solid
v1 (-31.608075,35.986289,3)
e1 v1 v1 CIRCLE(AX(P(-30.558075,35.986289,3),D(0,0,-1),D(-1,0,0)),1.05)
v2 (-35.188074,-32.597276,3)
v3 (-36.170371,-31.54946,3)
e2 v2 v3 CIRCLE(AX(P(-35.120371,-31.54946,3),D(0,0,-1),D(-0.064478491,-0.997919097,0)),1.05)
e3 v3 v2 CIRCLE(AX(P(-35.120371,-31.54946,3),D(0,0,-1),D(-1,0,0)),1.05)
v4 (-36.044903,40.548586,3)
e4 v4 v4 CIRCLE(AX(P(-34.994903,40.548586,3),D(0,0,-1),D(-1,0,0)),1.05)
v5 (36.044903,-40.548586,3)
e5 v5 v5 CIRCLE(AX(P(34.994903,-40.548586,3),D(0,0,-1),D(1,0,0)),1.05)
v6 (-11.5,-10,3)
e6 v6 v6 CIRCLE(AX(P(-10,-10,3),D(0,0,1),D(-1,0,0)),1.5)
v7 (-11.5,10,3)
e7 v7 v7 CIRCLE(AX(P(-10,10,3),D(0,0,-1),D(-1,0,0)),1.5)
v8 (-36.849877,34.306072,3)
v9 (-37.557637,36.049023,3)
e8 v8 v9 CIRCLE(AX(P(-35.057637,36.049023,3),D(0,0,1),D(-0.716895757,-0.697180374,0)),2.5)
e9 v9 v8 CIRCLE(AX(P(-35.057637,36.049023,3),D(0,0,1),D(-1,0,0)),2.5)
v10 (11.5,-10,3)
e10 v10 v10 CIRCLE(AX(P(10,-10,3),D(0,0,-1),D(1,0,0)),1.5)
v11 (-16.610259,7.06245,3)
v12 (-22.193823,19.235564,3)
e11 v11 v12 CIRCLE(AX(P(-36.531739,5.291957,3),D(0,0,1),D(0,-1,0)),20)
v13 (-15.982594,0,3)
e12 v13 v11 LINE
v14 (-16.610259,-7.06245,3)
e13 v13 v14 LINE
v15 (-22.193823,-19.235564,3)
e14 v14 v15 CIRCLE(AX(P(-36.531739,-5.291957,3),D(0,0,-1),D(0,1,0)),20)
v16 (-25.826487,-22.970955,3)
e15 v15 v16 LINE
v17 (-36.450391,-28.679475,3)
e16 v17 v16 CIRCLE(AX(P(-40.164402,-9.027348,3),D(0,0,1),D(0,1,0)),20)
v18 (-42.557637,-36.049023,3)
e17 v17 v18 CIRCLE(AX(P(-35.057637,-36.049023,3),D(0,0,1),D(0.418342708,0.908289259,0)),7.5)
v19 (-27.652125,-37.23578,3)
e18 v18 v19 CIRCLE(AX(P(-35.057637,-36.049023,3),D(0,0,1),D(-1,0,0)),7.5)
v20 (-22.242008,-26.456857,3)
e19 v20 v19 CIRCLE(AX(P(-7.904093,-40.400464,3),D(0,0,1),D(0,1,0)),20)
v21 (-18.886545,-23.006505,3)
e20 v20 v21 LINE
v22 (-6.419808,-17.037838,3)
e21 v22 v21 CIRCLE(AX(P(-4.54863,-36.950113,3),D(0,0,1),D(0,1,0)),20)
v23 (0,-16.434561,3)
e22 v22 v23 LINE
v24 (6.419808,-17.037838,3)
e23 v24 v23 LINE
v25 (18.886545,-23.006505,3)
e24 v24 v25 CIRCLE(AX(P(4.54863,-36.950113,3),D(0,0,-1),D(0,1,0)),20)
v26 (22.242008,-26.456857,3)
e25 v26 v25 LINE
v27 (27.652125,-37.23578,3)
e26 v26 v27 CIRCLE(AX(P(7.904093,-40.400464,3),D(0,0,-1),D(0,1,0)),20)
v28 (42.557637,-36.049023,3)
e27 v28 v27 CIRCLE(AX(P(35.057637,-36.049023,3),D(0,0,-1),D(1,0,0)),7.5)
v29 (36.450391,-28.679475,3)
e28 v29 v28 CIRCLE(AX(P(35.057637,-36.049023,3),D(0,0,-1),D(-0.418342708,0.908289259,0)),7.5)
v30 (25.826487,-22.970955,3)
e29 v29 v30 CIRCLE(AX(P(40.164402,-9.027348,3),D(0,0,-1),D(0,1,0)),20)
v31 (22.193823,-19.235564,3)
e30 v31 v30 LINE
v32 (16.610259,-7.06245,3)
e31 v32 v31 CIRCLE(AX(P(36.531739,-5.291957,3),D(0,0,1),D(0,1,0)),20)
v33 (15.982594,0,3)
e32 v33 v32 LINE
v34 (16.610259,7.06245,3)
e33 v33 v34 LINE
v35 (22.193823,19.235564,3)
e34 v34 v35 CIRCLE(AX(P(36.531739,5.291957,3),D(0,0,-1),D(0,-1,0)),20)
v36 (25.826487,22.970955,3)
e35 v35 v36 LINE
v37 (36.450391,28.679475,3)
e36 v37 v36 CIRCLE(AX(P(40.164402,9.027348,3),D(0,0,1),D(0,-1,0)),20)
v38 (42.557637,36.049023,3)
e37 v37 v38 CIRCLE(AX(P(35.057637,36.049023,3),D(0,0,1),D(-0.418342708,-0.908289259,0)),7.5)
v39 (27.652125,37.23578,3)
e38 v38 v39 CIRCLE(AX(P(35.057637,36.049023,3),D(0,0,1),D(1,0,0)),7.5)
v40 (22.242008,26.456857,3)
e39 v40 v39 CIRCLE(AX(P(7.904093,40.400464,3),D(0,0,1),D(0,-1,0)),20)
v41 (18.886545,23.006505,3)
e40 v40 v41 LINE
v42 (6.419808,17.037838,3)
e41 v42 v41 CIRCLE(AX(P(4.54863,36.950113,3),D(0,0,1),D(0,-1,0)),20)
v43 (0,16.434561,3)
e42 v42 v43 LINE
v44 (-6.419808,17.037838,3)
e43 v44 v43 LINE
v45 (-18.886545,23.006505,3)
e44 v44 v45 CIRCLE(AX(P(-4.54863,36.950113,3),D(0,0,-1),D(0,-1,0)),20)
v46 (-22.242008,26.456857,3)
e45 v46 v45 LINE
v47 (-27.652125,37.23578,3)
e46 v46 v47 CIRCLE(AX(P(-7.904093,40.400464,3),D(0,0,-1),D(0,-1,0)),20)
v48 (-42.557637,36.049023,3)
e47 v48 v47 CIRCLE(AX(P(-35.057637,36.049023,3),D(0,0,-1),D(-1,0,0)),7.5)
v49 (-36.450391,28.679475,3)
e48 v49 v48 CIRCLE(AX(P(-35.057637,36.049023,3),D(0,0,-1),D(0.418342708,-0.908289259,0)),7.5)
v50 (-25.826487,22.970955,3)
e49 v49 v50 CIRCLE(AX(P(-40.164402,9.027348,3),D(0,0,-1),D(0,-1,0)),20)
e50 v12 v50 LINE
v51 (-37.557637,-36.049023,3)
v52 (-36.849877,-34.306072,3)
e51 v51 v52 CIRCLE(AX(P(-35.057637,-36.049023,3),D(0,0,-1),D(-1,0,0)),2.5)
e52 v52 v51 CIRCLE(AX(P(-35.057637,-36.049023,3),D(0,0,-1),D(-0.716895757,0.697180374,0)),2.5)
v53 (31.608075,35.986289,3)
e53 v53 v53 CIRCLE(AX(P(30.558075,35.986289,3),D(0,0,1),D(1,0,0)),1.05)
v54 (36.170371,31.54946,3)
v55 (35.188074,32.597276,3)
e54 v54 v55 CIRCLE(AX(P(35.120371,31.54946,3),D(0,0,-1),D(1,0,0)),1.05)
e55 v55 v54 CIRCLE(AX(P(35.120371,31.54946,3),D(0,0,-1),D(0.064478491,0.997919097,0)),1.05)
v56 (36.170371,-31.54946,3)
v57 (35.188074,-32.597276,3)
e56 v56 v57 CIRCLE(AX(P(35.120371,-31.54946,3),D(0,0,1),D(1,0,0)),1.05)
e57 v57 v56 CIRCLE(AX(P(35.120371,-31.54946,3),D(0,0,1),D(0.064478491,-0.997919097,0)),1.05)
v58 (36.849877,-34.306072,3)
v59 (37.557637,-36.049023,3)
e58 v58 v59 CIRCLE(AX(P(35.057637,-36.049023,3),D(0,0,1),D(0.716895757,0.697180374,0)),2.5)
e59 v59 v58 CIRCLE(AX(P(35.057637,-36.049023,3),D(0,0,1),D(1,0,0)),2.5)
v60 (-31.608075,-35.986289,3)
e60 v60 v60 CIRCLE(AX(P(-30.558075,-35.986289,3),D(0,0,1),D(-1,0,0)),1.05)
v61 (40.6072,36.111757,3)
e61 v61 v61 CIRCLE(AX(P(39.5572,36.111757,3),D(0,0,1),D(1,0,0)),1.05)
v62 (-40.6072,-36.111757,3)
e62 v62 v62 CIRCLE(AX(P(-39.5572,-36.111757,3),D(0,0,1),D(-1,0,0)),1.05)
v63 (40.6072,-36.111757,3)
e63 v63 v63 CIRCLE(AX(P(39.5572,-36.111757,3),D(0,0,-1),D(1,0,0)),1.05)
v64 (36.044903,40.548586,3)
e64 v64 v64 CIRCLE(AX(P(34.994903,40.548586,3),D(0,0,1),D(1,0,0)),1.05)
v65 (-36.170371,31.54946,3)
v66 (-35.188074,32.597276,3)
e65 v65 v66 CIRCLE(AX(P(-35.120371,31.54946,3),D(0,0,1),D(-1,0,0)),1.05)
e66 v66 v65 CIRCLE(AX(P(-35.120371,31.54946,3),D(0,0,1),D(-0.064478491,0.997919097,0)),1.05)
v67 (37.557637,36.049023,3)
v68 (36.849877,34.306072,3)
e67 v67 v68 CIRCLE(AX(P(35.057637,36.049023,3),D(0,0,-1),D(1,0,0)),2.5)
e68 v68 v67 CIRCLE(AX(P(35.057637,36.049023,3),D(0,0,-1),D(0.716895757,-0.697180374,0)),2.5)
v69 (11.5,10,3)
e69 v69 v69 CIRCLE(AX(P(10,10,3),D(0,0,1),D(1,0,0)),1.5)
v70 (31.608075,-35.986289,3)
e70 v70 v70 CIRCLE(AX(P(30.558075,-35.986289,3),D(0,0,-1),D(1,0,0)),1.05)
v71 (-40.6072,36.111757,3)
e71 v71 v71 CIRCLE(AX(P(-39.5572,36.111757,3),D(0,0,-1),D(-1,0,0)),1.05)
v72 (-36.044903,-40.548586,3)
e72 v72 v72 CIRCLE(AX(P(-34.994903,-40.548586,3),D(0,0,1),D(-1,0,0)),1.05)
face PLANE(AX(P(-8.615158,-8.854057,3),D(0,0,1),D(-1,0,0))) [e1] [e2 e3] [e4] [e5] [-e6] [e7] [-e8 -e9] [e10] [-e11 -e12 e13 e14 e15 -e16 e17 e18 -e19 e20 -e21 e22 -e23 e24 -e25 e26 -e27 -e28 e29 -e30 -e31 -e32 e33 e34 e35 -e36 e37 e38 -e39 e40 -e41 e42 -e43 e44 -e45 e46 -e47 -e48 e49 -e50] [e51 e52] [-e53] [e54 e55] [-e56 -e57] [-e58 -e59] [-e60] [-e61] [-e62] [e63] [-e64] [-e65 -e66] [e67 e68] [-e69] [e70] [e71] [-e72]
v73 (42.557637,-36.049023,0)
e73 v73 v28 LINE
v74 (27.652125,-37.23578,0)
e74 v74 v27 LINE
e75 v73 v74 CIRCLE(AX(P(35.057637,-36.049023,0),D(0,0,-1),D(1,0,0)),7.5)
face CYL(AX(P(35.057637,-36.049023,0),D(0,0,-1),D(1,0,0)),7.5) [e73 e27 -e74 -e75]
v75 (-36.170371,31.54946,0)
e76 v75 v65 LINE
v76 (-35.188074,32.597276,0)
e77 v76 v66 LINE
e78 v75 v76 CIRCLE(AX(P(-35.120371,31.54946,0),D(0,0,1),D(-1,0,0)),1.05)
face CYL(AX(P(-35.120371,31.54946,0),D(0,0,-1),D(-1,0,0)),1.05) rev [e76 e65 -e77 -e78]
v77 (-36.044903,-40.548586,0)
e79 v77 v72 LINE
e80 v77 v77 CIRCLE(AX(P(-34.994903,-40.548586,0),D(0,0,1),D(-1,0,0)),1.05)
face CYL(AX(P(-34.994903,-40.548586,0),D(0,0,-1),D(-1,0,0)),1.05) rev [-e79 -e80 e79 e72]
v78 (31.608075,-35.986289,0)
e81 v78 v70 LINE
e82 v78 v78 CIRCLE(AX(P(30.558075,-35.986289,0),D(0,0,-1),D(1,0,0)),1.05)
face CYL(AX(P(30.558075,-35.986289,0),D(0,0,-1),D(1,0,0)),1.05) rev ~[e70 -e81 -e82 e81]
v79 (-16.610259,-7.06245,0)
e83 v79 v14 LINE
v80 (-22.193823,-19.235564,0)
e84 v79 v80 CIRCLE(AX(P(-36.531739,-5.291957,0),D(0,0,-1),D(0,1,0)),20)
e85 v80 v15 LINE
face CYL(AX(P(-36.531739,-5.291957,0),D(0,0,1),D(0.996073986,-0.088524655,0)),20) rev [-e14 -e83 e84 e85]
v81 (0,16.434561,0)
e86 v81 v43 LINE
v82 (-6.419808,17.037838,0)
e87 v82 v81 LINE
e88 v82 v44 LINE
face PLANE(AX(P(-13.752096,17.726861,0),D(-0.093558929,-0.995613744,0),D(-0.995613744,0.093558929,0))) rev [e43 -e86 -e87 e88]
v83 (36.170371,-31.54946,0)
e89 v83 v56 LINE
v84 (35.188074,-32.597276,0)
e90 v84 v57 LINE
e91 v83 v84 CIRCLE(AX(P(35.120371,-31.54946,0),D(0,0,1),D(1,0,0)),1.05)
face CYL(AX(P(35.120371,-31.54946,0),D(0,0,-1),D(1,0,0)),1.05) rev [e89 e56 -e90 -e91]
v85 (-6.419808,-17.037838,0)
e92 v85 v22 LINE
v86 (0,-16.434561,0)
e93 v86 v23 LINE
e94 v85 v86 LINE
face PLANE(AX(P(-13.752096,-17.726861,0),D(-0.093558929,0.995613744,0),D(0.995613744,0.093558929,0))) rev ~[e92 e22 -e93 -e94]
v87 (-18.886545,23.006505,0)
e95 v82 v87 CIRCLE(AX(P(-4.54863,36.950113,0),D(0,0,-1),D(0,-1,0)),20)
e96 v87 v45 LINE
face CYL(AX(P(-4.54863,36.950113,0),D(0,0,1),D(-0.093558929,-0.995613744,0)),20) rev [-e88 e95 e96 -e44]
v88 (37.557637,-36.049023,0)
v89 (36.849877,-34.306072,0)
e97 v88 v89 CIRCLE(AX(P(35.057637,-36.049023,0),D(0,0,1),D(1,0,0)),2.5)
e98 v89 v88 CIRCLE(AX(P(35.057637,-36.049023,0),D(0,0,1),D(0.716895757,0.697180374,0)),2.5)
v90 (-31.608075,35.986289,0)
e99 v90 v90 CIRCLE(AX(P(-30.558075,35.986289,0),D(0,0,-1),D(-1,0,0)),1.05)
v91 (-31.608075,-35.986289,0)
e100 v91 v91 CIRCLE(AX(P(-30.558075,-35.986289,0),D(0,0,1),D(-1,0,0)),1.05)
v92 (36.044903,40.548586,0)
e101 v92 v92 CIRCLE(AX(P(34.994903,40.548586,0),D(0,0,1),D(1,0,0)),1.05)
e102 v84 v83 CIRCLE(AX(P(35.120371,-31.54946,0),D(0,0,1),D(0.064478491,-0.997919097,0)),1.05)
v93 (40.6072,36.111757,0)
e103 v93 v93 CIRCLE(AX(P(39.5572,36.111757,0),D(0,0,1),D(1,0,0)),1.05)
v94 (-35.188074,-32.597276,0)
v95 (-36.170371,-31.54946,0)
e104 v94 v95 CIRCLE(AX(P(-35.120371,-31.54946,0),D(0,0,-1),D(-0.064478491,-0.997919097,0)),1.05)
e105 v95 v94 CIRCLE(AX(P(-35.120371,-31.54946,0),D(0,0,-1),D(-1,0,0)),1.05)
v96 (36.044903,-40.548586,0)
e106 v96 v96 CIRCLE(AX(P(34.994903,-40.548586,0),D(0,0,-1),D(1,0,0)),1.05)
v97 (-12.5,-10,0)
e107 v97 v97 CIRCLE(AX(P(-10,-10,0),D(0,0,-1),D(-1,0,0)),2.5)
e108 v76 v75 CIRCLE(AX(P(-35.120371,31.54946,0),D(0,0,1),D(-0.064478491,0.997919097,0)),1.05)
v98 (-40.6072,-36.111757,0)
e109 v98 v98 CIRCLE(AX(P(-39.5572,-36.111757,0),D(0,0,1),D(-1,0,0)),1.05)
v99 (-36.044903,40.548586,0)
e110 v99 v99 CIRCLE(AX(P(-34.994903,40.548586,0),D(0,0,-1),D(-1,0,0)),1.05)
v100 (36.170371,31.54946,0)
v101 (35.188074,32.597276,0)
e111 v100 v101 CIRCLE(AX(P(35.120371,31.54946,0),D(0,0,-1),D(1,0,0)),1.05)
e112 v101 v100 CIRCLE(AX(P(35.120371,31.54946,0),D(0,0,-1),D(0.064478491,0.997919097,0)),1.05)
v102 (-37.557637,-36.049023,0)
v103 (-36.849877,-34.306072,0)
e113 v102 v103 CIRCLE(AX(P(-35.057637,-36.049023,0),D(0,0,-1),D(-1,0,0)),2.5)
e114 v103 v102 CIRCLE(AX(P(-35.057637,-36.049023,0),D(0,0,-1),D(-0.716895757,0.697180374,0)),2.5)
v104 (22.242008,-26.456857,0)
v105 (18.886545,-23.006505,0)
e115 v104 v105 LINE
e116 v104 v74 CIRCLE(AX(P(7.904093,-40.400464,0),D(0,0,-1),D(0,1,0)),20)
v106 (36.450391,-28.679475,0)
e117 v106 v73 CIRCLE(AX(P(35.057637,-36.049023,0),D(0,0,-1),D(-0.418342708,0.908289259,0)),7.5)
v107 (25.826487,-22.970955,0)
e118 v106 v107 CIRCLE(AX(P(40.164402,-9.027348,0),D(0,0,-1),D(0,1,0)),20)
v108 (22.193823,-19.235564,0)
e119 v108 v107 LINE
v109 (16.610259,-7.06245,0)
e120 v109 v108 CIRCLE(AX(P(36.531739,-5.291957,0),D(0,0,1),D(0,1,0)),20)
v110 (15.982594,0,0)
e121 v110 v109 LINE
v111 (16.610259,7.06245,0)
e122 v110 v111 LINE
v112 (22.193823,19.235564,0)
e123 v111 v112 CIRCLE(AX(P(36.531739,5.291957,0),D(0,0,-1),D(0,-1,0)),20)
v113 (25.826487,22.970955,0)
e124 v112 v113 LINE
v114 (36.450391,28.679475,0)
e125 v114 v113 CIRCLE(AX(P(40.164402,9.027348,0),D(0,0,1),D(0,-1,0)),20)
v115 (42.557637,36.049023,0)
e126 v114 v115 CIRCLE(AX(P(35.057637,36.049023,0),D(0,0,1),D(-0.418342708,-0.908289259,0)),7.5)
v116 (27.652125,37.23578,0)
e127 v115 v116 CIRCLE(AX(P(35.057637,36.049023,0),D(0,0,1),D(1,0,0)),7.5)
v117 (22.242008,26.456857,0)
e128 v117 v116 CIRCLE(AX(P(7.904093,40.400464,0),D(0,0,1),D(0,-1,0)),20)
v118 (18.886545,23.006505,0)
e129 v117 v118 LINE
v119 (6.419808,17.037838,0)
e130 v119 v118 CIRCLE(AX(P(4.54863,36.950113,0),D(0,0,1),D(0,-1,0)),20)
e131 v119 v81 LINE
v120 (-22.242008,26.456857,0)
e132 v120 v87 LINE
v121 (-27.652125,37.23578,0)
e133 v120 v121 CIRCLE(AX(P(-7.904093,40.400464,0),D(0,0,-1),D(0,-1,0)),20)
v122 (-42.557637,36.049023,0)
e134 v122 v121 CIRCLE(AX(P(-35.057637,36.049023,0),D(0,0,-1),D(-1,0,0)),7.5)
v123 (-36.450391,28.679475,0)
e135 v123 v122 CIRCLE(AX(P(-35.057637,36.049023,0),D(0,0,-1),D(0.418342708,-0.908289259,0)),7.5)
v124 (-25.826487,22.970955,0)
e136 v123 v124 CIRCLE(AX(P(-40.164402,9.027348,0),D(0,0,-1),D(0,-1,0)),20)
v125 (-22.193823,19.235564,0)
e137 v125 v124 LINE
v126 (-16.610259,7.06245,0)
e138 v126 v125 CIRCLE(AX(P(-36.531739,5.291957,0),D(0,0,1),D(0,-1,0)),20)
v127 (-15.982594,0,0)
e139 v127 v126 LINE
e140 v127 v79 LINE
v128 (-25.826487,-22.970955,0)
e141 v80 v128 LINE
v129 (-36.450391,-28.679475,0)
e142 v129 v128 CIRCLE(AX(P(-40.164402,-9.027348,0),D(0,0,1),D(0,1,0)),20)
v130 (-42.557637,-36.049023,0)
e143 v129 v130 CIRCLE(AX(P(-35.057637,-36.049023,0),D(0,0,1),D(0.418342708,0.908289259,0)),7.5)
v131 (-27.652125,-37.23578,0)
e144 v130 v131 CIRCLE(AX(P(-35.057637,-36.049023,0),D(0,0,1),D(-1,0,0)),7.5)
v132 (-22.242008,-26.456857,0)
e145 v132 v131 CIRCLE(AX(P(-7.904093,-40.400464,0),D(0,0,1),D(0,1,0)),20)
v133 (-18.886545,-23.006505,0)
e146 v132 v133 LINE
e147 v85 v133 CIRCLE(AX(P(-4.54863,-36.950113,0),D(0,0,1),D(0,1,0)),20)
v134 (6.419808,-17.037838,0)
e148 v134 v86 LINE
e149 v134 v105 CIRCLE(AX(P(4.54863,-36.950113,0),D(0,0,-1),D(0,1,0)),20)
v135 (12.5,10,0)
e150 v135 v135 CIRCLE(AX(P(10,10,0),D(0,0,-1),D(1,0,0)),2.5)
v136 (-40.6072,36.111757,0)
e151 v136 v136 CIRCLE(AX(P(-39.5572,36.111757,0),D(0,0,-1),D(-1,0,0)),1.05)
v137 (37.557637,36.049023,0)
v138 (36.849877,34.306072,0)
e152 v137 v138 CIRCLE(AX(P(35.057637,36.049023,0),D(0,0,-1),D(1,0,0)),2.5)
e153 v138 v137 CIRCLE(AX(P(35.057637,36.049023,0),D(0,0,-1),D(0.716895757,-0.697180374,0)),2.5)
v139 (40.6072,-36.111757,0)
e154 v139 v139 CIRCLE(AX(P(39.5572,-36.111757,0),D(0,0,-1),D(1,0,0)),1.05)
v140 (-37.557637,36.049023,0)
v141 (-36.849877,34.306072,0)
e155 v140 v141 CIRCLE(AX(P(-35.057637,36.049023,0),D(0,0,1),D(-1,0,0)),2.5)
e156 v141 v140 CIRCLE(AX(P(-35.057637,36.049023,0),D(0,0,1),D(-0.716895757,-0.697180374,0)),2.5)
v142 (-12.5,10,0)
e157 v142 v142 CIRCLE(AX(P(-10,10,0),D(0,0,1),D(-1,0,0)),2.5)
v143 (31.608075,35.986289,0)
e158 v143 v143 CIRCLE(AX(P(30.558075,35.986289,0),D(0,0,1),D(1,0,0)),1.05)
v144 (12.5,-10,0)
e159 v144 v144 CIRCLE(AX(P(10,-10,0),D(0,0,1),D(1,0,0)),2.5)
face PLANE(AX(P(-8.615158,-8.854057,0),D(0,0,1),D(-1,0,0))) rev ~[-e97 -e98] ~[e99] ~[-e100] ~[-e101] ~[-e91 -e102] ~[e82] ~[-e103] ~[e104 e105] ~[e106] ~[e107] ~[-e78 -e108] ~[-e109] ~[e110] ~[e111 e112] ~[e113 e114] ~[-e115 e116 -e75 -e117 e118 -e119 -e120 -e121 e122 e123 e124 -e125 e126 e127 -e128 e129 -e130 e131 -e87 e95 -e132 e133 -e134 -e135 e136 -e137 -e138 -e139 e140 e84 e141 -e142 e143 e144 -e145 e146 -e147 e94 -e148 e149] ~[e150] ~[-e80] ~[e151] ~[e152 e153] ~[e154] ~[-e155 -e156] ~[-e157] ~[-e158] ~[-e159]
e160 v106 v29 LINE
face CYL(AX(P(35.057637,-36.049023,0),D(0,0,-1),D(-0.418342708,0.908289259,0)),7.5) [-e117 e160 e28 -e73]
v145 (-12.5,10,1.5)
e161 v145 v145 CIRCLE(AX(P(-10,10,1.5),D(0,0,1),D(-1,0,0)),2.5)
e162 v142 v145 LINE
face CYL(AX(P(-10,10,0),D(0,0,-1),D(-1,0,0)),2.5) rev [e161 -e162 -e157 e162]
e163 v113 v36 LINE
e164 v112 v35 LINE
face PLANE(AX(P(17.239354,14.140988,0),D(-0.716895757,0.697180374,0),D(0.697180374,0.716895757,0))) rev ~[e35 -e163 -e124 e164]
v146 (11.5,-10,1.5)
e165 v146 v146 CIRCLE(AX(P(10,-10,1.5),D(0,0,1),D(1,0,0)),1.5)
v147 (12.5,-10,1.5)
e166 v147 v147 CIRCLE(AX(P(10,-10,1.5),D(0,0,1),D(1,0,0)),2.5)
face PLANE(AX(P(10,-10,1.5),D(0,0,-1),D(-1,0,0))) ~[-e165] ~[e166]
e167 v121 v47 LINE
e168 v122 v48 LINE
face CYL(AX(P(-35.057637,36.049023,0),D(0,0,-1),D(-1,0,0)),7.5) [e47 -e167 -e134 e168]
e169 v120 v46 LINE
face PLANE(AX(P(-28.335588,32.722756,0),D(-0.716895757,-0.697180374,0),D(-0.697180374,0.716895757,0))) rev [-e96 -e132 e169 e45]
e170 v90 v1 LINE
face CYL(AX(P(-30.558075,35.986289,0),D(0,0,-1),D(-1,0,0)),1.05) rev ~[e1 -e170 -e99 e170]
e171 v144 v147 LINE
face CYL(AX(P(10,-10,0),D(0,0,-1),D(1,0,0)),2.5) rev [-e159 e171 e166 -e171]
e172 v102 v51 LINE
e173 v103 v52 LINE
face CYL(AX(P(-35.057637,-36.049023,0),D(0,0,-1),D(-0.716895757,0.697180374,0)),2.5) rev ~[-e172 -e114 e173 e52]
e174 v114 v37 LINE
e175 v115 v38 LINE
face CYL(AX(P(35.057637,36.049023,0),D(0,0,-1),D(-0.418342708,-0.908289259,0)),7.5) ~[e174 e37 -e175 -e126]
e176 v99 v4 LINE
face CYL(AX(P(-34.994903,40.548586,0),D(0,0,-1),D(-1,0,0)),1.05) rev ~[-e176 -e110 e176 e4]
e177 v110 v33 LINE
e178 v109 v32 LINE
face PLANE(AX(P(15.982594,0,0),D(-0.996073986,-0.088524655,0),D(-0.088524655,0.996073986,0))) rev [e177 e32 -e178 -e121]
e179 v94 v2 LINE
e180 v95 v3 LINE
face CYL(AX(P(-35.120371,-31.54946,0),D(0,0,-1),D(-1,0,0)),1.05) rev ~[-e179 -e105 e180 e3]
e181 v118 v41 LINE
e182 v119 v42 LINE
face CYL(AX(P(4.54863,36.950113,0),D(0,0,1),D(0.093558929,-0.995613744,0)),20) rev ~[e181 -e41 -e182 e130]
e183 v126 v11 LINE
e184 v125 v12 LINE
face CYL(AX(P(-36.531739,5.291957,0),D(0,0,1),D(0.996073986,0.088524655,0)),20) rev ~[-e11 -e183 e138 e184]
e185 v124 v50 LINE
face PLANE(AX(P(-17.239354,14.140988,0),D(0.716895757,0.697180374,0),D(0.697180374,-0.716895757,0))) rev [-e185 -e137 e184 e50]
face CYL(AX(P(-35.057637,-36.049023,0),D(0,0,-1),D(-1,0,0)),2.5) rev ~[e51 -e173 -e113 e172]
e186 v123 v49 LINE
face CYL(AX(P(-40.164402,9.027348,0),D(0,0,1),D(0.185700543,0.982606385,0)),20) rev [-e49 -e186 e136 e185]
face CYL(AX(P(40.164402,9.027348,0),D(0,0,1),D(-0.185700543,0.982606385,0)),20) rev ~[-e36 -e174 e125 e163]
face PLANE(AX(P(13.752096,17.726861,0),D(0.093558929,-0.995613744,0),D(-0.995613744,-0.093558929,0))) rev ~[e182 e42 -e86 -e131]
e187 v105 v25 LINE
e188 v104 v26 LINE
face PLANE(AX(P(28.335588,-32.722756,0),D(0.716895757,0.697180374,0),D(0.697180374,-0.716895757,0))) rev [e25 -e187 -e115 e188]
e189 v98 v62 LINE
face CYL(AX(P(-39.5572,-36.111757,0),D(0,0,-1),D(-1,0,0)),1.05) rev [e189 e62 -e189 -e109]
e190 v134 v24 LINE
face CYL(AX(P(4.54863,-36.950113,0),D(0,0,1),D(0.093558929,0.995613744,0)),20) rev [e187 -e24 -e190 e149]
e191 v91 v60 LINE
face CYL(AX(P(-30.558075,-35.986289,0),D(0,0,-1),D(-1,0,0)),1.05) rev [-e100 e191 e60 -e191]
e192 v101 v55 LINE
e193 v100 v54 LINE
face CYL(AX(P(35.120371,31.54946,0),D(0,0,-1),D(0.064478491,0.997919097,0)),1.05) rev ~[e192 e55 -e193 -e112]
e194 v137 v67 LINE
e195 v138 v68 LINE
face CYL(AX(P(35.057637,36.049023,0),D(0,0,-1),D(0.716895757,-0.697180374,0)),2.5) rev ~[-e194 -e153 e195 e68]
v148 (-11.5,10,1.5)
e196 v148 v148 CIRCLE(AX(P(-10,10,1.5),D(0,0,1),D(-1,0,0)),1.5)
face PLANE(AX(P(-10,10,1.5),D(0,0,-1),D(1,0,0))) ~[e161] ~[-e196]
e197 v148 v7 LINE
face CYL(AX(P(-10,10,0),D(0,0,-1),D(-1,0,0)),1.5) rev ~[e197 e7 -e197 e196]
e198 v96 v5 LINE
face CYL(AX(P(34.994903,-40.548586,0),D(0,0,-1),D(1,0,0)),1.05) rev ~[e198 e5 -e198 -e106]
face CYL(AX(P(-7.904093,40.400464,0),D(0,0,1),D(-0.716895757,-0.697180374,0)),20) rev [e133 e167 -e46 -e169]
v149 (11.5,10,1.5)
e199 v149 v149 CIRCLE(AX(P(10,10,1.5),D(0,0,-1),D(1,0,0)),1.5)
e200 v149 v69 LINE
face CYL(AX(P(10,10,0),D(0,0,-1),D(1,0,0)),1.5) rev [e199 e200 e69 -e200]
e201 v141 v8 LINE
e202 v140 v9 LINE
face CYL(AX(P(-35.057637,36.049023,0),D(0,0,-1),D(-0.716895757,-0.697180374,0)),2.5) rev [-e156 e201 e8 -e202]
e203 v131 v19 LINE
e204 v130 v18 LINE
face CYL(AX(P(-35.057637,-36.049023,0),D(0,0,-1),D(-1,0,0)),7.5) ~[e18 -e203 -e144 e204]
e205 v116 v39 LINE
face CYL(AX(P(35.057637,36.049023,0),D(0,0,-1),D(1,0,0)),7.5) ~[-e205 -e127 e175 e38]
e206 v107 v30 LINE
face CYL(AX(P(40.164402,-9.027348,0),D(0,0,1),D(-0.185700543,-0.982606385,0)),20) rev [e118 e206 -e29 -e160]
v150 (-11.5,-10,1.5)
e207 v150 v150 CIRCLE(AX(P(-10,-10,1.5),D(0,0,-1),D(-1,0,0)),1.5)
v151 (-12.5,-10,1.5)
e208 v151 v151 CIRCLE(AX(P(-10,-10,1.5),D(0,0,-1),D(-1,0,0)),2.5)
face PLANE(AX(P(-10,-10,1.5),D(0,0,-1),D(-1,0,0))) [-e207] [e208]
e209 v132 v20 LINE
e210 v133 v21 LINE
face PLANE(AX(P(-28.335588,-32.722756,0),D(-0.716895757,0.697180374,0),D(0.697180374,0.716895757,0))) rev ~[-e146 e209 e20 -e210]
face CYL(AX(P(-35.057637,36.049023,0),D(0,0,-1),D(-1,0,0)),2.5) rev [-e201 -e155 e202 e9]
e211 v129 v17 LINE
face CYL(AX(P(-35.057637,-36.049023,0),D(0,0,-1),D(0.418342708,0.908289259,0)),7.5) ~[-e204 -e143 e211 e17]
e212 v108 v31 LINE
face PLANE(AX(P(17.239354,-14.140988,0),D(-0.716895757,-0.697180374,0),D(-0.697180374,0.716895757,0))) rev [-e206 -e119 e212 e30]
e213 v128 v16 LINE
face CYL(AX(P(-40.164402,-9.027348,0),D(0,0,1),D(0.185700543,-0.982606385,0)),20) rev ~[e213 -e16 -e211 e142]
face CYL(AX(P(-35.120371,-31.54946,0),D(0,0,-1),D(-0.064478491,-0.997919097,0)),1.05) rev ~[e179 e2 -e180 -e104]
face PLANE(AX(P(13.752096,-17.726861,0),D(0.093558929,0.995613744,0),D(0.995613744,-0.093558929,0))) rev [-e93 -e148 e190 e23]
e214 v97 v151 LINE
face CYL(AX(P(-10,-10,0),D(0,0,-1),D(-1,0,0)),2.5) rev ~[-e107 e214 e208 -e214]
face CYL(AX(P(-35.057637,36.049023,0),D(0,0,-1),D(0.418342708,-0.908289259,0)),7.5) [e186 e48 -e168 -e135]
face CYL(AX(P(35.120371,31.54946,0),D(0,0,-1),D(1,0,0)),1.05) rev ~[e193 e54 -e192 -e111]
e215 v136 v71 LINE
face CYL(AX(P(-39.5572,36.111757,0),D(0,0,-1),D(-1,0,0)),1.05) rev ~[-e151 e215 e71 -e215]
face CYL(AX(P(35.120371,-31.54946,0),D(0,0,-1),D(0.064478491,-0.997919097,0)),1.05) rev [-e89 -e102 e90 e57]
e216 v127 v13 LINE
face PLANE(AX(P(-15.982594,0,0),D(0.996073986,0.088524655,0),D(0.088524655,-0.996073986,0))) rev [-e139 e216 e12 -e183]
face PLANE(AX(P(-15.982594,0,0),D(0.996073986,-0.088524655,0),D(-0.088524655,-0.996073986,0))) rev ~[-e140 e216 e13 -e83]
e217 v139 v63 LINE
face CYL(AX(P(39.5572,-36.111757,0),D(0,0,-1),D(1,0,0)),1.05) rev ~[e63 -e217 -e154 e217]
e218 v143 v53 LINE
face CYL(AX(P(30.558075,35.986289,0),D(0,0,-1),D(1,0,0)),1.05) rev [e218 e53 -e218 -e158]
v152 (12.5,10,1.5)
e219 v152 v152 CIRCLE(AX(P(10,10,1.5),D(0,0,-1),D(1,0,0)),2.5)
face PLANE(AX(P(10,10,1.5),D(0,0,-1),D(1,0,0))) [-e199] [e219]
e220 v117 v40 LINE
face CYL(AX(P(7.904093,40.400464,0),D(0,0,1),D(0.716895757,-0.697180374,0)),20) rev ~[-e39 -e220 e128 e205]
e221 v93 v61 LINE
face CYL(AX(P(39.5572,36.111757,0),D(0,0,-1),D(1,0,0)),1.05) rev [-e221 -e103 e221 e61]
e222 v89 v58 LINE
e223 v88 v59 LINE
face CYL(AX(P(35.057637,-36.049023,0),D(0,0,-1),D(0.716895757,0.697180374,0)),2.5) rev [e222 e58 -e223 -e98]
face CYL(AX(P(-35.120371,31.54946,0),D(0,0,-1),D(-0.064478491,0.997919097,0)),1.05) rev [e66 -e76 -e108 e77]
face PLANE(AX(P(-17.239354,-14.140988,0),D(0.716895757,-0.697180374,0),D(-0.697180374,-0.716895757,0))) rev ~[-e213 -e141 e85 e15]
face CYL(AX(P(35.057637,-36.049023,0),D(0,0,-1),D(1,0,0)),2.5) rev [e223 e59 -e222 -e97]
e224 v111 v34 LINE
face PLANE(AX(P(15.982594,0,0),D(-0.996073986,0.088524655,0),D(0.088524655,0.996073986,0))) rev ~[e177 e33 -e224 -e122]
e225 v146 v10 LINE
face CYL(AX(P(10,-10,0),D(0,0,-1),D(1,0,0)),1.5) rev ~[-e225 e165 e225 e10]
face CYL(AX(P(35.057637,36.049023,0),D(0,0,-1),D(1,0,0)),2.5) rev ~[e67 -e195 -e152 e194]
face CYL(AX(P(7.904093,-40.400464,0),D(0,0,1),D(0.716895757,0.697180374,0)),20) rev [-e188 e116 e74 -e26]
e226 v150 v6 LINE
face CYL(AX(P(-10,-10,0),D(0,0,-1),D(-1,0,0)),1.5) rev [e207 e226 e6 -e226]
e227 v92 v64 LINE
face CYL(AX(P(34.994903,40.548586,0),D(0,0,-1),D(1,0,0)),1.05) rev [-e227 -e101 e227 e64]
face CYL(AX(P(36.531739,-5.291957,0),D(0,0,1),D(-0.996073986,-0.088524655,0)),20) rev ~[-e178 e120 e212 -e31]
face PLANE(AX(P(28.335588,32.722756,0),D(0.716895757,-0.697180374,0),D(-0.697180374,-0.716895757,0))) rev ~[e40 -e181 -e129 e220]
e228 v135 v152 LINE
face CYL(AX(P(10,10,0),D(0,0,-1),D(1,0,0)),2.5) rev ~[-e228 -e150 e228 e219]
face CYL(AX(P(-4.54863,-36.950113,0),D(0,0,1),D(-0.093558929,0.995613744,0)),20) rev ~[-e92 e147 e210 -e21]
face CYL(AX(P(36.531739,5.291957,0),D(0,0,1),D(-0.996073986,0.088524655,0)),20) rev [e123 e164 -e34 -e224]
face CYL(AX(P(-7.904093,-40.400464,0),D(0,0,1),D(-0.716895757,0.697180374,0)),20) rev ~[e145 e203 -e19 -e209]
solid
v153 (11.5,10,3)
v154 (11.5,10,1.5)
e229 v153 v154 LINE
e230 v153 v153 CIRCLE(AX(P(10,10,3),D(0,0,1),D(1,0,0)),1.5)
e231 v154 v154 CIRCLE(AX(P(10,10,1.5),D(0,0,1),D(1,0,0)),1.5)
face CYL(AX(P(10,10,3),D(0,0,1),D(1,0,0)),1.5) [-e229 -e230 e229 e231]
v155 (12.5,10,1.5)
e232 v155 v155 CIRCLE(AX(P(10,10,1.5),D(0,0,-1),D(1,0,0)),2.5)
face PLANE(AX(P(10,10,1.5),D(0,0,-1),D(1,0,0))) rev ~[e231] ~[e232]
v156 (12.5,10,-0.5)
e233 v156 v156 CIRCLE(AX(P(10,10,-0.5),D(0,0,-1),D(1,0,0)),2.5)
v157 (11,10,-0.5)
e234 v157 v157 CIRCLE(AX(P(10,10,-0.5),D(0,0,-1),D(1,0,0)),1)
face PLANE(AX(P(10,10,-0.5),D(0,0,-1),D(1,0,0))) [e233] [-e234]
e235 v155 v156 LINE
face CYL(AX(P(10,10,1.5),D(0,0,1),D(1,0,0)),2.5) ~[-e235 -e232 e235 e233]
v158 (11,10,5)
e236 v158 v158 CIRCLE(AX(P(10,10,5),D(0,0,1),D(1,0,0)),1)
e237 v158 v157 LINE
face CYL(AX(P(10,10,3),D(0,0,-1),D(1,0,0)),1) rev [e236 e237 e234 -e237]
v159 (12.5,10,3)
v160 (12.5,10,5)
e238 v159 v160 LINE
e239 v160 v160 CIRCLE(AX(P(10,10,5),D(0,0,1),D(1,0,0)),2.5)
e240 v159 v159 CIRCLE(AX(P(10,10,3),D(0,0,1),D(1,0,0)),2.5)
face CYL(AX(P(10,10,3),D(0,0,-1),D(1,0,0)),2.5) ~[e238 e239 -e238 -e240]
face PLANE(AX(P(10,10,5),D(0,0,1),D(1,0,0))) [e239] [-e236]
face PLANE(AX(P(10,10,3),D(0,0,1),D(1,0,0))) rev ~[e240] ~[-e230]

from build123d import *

# Parameters (mm, degrees)
F0_R      = 1.5
F0_R_2    = 1.05
F1_DEPTH  = 3
F2_R      = 20
F3_R      = 2.5
F4_DEPTH  = 1.5
F7_R      = 1.5
F7_R_2    = 1
F8_DEPTH  = 1.5
F9_R      = 2.5
F9_R_2    = 1.5
F9_R_3    = 1
F10_DEPTH = 2
F11_R     = 2.5
F11_R_2   = 1
F12_DEPTH = 2


with BuildPart() as f1:
    # F0 (on Top) → F1 (new body)
    with BuildSketch(Plane.XY):
        Polygon((17.5900963695, 18.0875221416), (13.7520964623, 17.7268610305), (0, 16.4345612622), (0, 0), (15.9825936427, 0), (17.239353816, 14.1409884306), align=None)
        with Locations((10, 10)):
            Circle(F0_R, mode=Mode.SUBTRACT)
        with BuildLine():
            ThreePointArc((31.9200670418, 29.2368537374), (29.8287845463, 30.6723050065), (28.3355882575, 32.722755607))
            Line((28.3355882575, 32.722755607), (13.7520964623, 17.7268610305))
            Line((13.7520964623, 17.7268610305), (17.5900963695, 18.0875221416))
            Line((17.5900963695, 18.0875221416), (17.239353816, 14.1409884306))
            Line((17.239353816, 14.1409884306), (31.9200670418, 29.2368537374))
        make_face()
        with BuildLine():
            ThreePointArc((31.9200670418, 29.2368537374), (39.1022771791, 29.7330997621), (42.5576373508, 36.049023183))
            ThreePointArc((42.5576373508, 36.049023183), (33.3496221576, 43.3519461663), (28.3355882575, 32.722755607))
            ThreePointArc((28.3355882575, 32.722755607), (29.8287845463, 30.6723050065), (31.9200670418, 29.2368537374))
        make_face()
        with BuildLine():
            ThreePointArc((35.1880737305, 32.5972755395), (35.8863959675, 32.2675873788), (36.1703713151, 31.5494604876))
            ThreePointArc((36.1703713151, 31.5494604876), (34.3543466627, 30.8313335964), (35.1880737305, 32.5972755395))
        make_face(mode=Mode.SUBTRACT)
        with Locations((30.5580746554, 35.9862892186)):
            Circle(F0_R_2, mode=Mode.SUBTRACT)
        with BuildLine():
            ThreePointArc((36.8498767429, 34.3060722482), (32.7413257914, 36.9896085113), (37.5576373508, 36.049023183))
            ThreePointArc((37.5576373508, 36.049023183), (37.3739489102, 35.1084378547), (36.8498767429, 34.3060722482))
        make_face(mode=Mode.SUBTRACT)
        with Locations((39.5572000461, 36.1117571474)):
            Circle(F0_R_2, mode=Mode.SUBTRACT)
        with Locations((34.9949033864, 40.5485858784)):
            Circle(F0_R_2, mode=Mode.SUBTRACT)
    extrude(amount=F1_DEPTH)

    # F2
    f2_edges = [f1.edges().sort_by_distance(p)[0] for p in [
        (17.239354, 14.140988, 1.5),
        (13.752096, 17.726861, 1.5),
        (31.920067, 29.236854, 1.5),
        (28.335588, 32.722756, 1.5),
    ]]
    fillet(f2_edges, radius=F2_R)

    # F3 (on face) → F4 (cut)
    with BuildSketch(Plane(origin=(0, 0, 0), x_dir=(1, 0, 0), z_dir=(0, 0, -1))):
        with Locations((10, -10)):
            Circle(F3_R)
    extrude(amount=-F4_DEPTH, mode=Mode.SUBTRACT)

    # F5: F1 across plane


with BuildPart() as f1_1:
    add(f1.part)
    add(f1.part.mirror(Plane.YZ))

    # F6: F1 across plane


with BuildPart() as f1_2:
    add(f1_1.part)
    add(f1_1.part.mirror(Plane.XZ))


with BuildPart() as f8:
    # F7 (on face) → F8 (new body)
    with BuildSketch(Plane.XY.offset(3)):
        with Locations((10, 10)):
            Circle(F7_R)
        with Locations((10, 10)):
            Circle(F7_R_2, mode=Mode.SUBTRACT)
    extrude(amount=-F8_DEPTH)

    # F9 (on face) → F10 (join)
    with BuildSketch(Plane(origin=(0, 0, 1.5), x_dir=(1, 0, 0), z_dir=(0, 0, -1))):
        with Locations((10, -10)):
            Circle(F9_R)
        with Locations((10, -10)):
            Circle(F9_R_2, mode=Mode.SUBTRACT)
        with Locations((10, -10)):
            Circle(F9_R_2)
        with Locations((10, -10)):
            Circle(F9_R_3, mode=Mode.SUBTRACT)
    extrude(amount=F10_DEPTH)

    # F11 (on face) → F12 (join)
    with BuildSketch(Plane.XY.offset(3)):
        with Locations((10, 10)):
            Circle(F11_R)
        with Locations((10, 10)):
            Circle(F11_R_2, mode=Mode.SUBTRACT)
    extrude(amount=F12_DEPTH)


solid = Compound([f1_2.part, f8.part])
